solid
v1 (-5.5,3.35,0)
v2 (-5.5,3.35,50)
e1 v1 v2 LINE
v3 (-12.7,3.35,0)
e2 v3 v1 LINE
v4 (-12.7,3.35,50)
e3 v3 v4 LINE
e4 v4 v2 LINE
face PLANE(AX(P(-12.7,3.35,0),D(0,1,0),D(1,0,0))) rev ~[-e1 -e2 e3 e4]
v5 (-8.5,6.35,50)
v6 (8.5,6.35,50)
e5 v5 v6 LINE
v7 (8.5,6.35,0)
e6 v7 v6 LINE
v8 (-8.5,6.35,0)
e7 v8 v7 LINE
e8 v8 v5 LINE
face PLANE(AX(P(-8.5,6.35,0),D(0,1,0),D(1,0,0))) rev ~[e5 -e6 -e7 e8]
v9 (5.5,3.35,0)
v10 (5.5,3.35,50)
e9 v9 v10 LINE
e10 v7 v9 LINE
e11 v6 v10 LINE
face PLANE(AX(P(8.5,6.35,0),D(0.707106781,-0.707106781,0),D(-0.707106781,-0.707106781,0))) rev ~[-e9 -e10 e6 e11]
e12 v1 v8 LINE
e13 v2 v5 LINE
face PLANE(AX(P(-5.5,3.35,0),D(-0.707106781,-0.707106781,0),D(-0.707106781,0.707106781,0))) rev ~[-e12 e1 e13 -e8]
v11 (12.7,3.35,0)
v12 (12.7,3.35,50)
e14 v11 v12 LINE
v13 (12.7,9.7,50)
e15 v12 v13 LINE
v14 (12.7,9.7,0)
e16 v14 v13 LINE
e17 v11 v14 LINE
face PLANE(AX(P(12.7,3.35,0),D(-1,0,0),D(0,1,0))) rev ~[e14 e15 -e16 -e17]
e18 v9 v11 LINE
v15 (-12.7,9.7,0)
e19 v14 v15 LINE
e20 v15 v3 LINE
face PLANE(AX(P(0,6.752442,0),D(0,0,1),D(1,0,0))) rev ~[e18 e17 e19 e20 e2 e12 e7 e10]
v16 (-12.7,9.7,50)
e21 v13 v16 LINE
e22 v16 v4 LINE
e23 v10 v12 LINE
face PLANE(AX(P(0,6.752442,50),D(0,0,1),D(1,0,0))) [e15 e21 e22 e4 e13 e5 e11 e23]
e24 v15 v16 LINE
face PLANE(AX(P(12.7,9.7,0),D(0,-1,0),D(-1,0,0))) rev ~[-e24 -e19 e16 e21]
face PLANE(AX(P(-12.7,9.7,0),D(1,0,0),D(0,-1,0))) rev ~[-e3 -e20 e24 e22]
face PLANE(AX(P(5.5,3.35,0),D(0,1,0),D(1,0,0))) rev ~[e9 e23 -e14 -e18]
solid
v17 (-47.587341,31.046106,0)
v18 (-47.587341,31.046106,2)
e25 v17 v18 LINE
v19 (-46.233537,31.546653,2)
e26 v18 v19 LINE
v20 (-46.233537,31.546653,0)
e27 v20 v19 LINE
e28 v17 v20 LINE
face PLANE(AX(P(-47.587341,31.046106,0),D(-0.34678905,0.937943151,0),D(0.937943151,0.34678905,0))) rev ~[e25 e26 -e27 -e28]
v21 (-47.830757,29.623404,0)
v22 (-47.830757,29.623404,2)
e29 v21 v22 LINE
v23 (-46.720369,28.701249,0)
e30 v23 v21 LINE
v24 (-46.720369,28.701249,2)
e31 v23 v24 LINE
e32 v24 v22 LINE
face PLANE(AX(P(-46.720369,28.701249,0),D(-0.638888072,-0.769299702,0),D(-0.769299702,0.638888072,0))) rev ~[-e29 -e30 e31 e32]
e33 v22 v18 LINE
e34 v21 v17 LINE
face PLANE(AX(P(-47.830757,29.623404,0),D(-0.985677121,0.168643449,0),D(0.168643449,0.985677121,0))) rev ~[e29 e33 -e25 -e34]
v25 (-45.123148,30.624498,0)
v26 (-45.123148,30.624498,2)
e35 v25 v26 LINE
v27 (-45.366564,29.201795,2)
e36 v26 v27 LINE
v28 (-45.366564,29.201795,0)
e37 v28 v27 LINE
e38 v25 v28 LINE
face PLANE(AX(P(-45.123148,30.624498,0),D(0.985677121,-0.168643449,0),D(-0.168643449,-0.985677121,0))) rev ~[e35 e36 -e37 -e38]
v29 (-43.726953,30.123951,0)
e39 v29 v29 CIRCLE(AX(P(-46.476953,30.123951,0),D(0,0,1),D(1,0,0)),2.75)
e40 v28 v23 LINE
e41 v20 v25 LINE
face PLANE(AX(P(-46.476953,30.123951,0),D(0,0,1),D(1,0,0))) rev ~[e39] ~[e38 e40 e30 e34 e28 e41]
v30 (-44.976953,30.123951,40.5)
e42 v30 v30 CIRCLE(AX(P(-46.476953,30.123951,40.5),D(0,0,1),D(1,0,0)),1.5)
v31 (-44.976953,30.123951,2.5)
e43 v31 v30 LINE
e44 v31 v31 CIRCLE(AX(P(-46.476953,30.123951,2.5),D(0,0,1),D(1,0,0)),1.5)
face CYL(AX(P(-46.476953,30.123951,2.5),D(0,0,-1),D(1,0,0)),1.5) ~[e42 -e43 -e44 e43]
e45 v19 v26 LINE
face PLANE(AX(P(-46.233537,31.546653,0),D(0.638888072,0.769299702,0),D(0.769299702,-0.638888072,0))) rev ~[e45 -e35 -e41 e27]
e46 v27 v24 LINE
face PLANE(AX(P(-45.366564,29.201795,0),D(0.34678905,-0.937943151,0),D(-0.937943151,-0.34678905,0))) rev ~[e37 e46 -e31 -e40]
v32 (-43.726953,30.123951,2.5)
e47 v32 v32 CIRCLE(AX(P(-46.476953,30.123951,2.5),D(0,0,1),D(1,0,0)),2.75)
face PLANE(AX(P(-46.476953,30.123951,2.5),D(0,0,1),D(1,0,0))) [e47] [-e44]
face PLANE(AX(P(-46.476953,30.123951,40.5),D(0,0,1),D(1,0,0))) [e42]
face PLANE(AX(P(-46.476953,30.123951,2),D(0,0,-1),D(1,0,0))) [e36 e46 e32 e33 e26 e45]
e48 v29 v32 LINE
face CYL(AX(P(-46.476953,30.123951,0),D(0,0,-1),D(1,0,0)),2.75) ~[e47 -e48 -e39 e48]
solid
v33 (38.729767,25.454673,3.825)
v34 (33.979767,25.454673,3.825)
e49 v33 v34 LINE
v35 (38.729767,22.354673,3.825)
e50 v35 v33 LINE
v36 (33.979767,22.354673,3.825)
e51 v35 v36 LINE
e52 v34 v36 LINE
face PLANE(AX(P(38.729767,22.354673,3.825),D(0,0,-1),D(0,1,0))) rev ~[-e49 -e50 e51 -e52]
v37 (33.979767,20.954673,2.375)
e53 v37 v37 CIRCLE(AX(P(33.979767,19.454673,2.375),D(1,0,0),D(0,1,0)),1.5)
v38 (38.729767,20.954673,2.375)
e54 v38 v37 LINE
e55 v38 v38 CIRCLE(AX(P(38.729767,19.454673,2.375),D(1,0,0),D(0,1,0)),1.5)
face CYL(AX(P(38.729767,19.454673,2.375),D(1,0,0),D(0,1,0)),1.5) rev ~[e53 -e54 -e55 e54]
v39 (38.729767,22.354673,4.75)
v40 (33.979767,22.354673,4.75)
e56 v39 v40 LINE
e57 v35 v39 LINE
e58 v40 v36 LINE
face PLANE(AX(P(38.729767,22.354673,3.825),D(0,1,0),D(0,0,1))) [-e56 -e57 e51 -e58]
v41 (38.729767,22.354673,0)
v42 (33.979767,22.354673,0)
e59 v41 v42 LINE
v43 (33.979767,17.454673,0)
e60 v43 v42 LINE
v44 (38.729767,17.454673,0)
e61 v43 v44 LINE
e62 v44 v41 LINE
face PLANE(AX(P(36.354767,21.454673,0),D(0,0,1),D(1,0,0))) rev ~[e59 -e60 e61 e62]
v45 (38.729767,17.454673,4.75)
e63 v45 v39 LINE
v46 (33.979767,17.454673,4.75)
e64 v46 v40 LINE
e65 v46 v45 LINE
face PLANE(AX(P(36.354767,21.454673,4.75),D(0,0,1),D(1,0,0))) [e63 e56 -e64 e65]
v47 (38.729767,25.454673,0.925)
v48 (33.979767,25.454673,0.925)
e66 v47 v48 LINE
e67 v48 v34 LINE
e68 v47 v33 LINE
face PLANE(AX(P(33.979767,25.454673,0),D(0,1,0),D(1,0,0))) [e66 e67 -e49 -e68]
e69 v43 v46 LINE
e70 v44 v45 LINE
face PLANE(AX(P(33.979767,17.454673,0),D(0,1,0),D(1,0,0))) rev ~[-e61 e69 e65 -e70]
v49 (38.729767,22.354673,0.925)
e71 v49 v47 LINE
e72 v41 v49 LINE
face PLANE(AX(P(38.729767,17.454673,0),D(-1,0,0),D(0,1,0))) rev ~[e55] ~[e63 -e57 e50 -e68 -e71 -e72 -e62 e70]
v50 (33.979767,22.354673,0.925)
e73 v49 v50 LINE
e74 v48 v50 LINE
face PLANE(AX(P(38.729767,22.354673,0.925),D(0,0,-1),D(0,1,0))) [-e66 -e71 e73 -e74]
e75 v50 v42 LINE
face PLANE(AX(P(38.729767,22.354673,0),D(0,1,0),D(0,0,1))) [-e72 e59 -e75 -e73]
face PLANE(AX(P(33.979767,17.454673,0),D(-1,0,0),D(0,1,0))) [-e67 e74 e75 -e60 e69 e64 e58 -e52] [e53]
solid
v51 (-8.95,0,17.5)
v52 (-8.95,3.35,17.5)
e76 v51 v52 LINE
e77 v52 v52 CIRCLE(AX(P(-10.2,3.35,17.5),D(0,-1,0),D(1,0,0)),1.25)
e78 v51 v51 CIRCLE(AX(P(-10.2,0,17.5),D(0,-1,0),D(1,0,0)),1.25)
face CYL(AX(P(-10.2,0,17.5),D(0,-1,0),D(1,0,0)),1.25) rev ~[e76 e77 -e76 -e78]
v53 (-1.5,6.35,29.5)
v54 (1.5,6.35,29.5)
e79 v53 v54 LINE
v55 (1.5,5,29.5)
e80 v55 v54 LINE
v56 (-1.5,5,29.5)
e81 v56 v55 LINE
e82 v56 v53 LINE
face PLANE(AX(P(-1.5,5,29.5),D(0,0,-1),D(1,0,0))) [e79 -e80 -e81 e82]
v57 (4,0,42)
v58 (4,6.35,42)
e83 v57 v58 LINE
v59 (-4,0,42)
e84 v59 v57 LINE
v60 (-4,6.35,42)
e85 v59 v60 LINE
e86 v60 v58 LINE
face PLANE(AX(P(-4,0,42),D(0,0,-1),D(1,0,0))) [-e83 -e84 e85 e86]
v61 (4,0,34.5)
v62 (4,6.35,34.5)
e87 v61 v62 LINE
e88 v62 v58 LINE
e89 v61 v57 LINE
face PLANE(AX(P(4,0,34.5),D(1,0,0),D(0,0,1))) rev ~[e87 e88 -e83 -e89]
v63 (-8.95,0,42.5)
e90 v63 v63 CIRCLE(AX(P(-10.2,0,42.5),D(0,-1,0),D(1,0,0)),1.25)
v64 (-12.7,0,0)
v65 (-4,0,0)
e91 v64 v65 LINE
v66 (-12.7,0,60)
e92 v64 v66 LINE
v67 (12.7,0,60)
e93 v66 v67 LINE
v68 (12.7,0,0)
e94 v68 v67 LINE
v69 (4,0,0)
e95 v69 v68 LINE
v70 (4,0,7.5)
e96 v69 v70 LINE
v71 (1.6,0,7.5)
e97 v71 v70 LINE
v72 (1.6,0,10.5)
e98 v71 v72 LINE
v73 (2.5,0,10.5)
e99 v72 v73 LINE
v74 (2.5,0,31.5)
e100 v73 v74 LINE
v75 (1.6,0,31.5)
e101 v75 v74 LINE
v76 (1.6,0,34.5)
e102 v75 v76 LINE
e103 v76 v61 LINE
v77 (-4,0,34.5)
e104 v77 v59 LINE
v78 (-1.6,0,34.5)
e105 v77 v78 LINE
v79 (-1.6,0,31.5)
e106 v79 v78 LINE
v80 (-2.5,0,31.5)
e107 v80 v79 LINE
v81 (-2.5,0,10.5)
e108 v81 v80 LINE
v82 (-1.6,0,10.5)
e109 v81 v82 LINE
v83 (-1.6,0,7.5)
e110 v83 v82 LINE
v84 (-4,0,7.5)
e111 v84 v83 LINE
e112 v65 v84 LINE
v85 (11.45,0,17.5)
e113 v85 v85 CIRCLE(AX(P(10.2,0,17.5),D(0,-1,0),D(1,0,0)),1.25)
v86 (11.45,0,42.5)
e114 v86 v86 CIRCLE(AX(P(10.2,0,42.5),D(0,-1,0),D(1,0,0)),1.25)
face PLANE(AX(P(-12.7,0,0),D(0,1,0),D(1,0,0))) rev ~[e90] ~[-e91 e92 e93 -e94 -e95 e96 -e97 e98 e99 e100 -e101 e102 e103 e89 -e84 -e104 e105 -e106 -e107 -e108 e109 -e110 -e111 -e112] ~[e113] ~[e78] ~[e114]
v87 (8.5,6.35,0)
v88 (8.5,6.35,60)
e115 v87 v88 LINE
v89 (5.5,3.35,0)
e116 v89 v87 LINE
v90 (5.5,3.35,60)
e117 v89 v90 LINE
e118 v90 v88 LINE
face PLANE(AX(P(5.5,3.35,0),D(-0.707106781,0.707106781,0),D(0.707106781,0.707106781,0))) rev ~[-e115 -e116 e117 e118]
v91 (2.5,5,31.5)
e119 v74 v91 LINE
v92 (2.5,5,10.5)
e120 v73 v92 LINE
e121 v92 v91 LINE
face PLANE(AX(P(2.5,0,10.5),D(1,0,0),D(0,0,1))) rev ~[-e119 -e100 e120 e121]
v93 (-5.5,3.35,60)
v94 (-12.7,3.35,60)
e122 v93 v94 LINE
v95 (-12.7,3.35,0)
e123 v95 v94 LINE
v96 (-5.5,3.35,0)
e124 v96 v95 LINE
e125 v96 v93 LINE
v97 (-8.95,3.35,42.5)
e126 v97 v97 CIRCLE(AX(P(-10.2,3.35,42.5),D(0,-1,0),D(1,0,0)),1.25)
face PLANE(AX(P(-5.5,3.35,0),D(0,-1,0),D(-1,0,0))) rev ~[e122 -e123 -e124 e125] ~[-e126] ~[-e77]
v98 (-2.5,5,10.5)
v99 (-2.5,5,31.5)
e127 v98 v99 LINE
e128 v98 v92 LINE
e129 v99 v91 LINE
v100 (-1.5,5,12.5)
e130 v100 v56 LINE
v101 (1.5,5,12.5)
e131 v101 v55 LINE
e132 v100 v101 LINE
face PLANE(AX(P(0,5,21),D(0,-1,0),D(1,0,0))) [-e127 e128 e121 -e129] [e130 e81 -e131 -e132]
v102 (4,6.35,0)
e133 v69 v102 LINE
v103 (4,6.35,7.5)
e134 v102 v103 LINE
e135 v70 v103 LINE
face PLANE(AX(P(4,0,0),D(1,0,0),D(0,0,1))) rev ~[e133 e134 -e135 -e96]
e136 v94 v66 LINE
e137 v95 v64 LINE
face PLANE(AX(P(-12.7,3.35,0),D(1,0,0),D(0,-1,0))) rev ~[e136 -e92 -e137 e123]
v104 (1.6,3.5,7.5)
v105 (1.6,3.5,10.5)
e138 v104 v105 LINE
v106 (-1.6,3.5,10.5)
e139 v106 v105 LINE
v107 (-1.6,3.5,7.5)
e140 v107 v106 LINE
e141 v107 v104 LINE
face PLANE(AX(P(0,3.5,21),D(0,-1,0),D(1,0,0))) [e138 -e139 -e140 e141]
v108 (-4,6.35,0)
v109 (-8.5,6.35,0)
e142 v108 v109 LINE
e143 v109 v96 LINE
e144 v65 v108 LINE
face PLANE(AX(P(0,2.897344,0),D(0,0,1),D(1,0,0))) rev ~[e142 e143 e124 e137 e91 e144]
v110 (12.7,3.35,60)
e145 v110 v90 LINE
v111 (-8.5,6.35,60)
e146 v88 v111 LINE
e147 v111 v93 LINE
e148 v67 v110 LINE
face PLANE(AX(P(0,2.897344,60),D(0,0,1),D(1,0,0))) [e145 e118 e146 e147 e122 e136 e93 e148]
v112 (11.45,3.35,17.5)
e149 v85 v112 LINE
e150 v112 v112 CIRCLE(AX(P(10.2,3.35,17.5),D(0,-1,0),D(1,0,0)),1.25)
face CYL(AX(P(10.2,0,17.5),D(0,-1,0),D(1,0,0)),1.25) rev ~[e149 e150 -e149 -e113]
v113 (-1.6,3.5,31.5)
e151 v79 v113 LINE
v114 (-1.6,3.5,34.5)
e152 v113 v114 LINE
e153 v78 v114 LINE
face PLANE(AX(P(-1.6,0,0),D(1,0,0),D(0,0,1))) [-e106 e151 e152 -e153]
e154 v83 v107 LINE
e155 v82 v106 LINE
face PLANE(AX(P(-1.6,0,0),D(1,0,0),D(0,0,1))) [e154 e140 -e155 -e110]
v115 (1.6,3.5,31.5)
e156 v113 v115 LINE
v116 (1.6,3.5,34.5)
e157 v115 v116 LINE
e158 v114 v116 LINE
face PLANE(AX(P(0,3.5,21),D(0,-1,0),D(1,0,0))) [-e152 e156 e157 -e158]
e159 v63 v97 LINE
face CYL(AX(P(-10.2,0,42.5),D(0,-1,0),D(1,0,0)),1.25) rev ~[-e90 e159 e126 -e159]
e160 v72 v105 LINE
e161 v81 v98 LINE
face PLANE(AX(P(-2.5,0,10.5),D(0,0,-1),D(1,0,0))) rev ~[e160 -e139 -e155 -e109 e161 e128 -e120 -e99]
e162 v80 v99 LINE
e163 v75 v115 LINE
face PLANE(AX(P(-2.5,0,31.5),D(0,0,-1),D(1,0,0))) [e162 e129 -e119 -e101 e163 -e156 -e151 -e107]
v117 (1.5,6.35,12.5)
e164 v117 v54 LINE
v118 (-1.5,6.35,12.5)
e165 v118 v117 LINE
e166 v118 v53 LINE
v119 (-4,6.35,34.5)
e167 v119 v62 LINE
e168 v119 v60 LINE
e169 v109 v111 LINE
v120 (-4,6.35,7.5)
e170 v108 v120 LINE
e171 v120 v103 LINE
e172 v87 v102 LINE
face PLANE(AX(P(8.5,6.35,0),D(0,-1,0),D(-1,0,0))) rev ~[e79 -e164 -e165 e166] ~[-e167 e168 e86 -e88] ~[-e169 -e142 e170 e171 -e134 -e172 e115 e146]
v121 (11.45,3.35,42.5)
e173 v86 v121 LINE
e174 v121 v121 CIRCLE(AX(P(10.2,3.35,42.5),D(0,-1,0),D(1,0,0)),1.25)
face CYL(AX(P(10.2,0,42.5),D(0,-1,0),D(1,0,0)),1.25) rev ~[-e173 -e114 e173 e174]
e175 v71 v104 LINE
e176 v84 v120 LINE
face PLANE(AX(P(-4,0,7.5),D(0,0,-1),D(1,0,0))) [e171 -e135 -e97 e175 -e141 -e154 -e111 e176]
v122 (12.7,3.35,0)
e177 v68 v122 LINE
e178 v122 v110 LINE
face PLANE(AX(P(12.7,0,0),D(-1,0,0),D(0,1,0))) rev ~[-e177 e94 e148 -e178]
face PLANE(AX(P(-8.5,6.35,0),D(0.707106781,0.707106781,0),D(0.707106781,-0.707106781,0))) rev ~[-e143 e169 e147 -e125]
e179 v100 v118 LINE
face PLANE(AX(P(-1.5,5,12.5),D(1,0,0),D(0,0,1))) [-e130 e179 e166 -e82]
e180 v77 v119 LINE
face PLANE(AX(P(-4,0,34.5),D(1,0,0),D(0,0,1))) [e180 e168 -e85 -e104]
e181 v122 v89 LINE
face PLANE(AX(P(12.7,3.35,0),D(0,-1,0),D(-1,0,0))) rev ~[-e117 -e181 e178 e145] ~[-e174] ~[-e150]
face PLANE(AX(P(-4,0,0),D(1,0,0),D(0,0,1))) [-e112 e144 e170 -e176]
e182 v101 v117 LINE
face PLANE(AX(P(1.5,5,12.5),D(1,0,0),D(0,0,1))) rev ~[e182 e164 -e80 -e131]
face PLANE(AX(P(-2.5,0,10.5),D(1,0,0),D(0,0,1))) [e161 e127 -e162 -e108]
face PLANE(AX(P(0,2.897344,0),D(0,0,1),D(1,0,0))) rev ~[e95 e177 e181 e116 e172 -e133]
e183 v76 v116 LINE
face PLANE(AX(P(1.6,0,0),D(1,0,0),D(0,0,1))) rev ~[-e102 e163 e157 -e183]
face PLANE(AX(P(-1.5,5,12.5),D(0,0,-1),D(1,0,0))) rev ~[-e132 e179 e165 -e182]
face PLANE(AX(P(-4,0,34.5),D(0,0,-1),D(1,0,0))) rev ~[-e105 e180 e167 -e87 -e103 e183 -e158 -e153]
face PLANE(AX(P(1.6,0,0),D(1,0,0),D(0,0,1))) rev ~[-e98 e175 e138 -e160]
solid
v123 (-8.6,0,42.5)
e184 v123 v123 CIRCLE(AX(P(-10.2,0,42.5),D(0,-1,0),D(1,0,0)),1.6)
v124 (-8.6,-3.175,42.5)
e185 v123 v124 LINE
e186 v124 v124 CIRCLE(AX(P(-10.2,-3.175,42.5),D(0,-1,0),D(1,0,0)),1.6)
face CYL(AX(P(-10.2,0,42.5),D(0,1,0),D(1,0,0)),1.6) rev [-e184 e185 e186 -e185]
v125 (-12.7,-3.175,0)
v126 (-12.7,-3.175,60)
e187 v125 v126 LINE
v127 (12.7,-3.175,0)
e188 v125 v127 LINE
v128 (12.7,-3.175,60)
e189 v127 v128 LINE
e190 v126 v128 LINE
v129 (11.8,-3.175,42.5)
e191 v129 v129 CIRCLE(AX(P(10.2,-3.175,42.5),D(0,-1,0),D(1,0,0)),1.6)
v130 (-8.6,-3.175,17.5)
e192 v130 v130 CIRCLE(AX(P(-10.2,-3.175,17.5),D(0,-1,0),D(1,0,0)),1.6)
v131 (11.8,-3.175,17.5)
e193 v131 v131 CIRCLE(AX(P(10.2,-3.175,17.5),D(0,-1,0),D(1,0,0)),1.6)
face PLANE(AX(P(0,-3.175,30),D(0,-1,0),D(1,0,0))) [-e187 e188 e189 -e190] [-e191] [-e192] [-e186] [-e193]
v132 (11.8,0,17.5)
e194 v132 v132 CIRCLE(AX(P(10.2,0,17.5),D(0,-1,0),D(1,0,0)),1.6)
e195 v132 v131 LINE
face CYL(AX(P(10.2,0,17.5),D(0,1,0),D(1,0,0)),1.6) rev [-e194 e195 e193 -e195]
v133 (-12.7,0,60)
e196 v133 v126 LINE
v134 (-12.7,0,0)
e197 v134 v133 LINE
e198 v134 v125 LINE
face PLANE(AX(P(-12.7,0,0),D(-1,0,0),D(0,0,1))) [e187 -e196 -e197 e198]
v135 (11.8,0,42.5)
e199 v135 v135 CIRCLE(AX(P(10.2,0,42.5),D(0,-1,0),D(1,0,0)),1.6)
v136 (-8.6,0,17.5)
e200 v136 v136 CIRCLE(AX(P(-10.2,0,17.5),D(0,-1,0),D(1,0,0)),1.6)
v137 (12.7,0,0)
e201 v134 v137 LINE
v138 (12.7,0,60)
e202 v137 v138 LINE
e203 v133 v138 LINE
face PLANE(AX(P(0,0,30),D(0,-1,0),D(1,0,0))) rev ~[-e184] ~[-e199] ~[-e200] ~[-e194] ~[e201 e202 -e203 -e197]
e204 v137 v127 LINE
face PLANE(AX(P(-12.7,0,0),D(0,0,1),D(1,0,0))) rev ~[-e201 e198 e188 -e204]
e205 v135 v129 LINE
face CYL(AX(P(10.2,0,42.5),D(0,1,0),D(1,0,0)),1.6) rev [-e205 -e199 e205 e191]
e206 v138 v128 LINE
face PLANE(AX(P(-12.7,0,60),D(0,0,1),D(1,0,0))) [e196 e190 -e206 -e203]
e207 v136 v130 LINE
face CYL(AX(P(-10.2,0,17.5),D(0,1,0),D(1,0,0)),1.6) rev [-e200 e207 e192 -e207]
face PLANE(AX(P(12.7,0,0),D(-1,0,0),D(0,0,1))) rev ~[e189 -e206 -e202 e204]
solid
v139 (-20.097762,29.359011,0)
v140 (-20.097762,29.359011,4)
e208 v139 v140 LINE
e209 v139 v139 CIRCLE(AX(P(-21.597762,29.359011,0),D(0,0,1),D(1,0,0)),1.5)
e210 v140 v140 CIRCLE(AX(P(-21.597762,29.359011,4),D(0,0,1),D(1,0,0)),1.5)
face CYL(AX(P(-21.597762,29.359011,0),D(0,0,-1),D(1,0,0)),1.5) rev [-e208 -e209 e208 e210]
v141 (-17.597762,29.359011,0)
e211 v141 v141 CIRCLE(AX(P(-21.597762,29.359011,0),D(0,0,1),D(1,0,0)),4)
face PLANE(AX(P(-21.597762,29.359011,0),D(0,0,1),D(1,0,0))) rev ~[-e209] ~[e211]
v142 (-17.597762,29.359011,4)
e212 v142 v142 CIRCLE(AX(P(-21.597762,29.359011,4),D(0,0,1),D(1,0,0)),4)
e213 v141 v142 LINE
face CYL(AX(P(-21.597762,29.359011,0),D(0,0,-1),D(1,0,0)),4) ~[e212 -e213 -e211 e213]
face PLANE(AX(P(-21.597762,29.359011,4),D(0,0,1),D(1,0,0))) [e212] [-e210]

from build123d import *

# Parameters (mm, degrees)
F1_DEPTH  = 60
F2_W      = 3.2
F2_H      = 42
F3_DEPTH  = 3.5
F4_W      = 8
F4_H      = 7.5
F5_DEPTH  = 6.351
F6_W      = 5
F6_H      = 21
F7_DEPTH  = 5
F8_R      = 2.75
F9_DEPTH  = 2.5
F10_R     = 1.5
F11_DEPTH = 38
F13_R     = 4
F13_R_2   = 1.5
F14_DEPTH = 4
F15_DEPTH = 2
F16_W     = 3
F16_H     = 17
F17_DEPTH = 28.3600109795
F18_R     = 1.25
F19_DEPTH = 3.35
F20_W     = 25.4
F20_H     = 60
F20_R     = 1.6
F21_DEPTH = 3.175
F23_DEPTH = 50
F24_W     = 4.75
F24_H     = 8
F25_DEPTH = 4.75
F26_R     = 1.5
F27_DEPTH = 87.9577198902
F28_W     = 3.1
F28_H     = 0.925
F29_DEPTH = 87.9577198902


# Not quite as in the source:
# - a length typed as a fraction of an inch, garbled in the dataset ("3 / 203.2 mm" for 3/8 in), is restored


with BuildPart() as f1:
    # F0 (on Top) → F1 (new body)
    with BuildSketch(Plane.XY):
        Polygon((-12.7, 3.35), (-12.7, 0), (12.7, 0), (12.7, 3.35), (5.5, 3.35), (8.5, 6.35), (-8.5, 6.35), (-5.5, 3.35), align=None)
    extrude(amount=F1_DEPTH)

    # F2 (on face) → F3 (cut)
    with BuildSketch(Plane.XZ):
        with Locations((0, 21)):
            Rectangle(F2_W, F2_H)
    extrude(amount=-F3_DEPTH, mode=Mode.SUBTRACT)

    # F4 (on face) → F5 (cut, through all)
    with BuildSketch(Plane.XZ):
        with Locations((0, 38.25)):
            Rectangle(F4_W, F4_H)
        with Locations((0, 3.75)):
            Rectangle(F4_W, F4_H)
    extrude(amount=-F5_DEPTH, mode=Mode.SUBTRACT)

    # F6 (on face) → F7 (cut)
    with BuildSketch(Plane.XZ):
        with Locations((0, 21)):
            Rectangle(F6_W, F6_H)
    extrude(amount=-F7_DEPTH, mode=Mode.SUBTRACT)

    # F16 (on face) → F17 (cut, through all)
    with BuildSketch(Plane.XZ.offset(-5)):
        with Locations((0, 21)):
            Rectangle(F16_W, F16_H)
    extrude(amount=-F17_DEPTH, mode=Mode.SUBTRACT)

    # F18 (on face) → F19 (cut, through all)
    with BuildSketch(Plane.XZ):
        with Locations((10.2, 17.5)):
            Circle(F18_R)
        with Locations((-10.2, 17.5)):
            Circle(F18_R)
        with Locations((10.2, 42.5)):
            Circle(F18_R)
        with Locations((-10.2, 42.5)):
            Circle(F18_R)
    extrude(amount=-F19_DEPTH, mode=Mode.SUBTRACT)


with BuildPart() as f9:
    # F8 (on Top) → F9 (new body)
    with BuildSketch(Plane.XY):
        with Locations((-46.4769527316, 30.1239509135)):
            Circle(F8_R)
    extrude(amount=F9_DEPTH)

    # F10 (on face) → F11 (join)
    with BuildSketch(Plane.XY.offset(2.5)):
        with Locations((-46.4769527316, 30.1239509135)):
            Circle(F10_R)
    extrude(amount=F11_DEPTH)

    # F12 (on face) → F15 (cut)
    with BuildSketch(Plane(origin=(0, 0, 0), x_dir=(1, 0, 0), z_dir=(0, 0, -1))):
        Polygon((-46.7203685833, -28.7012485355), (-47.8307570588, -29.6234040357), (-47.5873412072, -31.0461064138), (-46.23353688, -31.5466532916), (-45.1231484044, -30.6244977914), (-45.366564256, -29.2017954133), align=None)
    extrude(amount=-F15_DEPTH, mode=Mode.SUBTRACT)


with BuildPart() as f14:
    # F13 (on Top) → F14 (new body)
    with BuildSketch(Plane.XY):
        with Locations((-21.5977616608, 29.3590109795)):
            Circle(F13_R)
        with Locations((-21.5977616608, 29.3590109795)):
            Circle(F13_R_2, mode=Mode.SUBTRACT)
    extrude(amount=F14_DEPTH)


with BuildPart() as f21:
    # F20 (on face) → F21 (new body)
    with BuildSketch(Plane.XZ):
        with Locations((0, 30)):
            Rectangle(F20_W, F20_H)
        with Locations((-10.2, 17.5)):
            Circle(F20_R, mode=Mode.SUBTRACT)
        with Locations((10.2, 17.5)):
            Circle(F20_R, mode=Mode.SUBTRACT)
        with Locations((-10.2, 42.5)):
            Circle(F20_R, mode=Mode.SUBTRACT)
        with Locations((10.2, 42.5)):
            Circle(F20_R, mode=Mode.SUBTRACT)
    extrude(amount=F21_DEPTH)


with BuildPart() as f23:
    # F22 (on Top) → F23 (new body)
    with BuildSketch(Plane.XY):
        Polygon((12.7, 9.7), (-12.7, 9.7), (-12.7, 3.35), (-5.5, 3.35), (-8.5, 6.35), (8.5, 6.35), (5.5, 3.35), (12.7, 3.35), align=None)
    extrude(amount=F23_DEPTH)


with BuildPart() as f25:
    # F24 (on Top) → F25 (new body)
    with BuildSketch(Plane.XY):
        with Locations((36.3547671586, 21.4546729288)):
            Rectangle(F24_W, F24_H)
    extrude(amount=F25_DEPTH)

    # F26 (on face) → F27 (cut, through all)
    with BuildSketch(Plane.YZ.offset(38.7297671586)):
        with Locations((19.4546729288, 2.375)):
            Circle(F26_R)
    extrude(amount=-F27_DEPTH, mode=Mode.SUBTRACT)

    # F28 (on face) → F29 (cut, through all)
    with BuildSketch(Plane.YZ.offset(38.7297671586)):
        with Locations((23.9046729288, 4.2875)):
            Rectangle(F28_W, F28_H)
        with Locations((23.9046729288, 0.4625)):
            Rectangle(F28_W, F28_H)
    extrude(amount=-F29_DEPTH, mode=Mode.SUBTRACT)


solid = Compound([f1.part, f9.part, f14.part, f21.part, f23.part, f25.part])
